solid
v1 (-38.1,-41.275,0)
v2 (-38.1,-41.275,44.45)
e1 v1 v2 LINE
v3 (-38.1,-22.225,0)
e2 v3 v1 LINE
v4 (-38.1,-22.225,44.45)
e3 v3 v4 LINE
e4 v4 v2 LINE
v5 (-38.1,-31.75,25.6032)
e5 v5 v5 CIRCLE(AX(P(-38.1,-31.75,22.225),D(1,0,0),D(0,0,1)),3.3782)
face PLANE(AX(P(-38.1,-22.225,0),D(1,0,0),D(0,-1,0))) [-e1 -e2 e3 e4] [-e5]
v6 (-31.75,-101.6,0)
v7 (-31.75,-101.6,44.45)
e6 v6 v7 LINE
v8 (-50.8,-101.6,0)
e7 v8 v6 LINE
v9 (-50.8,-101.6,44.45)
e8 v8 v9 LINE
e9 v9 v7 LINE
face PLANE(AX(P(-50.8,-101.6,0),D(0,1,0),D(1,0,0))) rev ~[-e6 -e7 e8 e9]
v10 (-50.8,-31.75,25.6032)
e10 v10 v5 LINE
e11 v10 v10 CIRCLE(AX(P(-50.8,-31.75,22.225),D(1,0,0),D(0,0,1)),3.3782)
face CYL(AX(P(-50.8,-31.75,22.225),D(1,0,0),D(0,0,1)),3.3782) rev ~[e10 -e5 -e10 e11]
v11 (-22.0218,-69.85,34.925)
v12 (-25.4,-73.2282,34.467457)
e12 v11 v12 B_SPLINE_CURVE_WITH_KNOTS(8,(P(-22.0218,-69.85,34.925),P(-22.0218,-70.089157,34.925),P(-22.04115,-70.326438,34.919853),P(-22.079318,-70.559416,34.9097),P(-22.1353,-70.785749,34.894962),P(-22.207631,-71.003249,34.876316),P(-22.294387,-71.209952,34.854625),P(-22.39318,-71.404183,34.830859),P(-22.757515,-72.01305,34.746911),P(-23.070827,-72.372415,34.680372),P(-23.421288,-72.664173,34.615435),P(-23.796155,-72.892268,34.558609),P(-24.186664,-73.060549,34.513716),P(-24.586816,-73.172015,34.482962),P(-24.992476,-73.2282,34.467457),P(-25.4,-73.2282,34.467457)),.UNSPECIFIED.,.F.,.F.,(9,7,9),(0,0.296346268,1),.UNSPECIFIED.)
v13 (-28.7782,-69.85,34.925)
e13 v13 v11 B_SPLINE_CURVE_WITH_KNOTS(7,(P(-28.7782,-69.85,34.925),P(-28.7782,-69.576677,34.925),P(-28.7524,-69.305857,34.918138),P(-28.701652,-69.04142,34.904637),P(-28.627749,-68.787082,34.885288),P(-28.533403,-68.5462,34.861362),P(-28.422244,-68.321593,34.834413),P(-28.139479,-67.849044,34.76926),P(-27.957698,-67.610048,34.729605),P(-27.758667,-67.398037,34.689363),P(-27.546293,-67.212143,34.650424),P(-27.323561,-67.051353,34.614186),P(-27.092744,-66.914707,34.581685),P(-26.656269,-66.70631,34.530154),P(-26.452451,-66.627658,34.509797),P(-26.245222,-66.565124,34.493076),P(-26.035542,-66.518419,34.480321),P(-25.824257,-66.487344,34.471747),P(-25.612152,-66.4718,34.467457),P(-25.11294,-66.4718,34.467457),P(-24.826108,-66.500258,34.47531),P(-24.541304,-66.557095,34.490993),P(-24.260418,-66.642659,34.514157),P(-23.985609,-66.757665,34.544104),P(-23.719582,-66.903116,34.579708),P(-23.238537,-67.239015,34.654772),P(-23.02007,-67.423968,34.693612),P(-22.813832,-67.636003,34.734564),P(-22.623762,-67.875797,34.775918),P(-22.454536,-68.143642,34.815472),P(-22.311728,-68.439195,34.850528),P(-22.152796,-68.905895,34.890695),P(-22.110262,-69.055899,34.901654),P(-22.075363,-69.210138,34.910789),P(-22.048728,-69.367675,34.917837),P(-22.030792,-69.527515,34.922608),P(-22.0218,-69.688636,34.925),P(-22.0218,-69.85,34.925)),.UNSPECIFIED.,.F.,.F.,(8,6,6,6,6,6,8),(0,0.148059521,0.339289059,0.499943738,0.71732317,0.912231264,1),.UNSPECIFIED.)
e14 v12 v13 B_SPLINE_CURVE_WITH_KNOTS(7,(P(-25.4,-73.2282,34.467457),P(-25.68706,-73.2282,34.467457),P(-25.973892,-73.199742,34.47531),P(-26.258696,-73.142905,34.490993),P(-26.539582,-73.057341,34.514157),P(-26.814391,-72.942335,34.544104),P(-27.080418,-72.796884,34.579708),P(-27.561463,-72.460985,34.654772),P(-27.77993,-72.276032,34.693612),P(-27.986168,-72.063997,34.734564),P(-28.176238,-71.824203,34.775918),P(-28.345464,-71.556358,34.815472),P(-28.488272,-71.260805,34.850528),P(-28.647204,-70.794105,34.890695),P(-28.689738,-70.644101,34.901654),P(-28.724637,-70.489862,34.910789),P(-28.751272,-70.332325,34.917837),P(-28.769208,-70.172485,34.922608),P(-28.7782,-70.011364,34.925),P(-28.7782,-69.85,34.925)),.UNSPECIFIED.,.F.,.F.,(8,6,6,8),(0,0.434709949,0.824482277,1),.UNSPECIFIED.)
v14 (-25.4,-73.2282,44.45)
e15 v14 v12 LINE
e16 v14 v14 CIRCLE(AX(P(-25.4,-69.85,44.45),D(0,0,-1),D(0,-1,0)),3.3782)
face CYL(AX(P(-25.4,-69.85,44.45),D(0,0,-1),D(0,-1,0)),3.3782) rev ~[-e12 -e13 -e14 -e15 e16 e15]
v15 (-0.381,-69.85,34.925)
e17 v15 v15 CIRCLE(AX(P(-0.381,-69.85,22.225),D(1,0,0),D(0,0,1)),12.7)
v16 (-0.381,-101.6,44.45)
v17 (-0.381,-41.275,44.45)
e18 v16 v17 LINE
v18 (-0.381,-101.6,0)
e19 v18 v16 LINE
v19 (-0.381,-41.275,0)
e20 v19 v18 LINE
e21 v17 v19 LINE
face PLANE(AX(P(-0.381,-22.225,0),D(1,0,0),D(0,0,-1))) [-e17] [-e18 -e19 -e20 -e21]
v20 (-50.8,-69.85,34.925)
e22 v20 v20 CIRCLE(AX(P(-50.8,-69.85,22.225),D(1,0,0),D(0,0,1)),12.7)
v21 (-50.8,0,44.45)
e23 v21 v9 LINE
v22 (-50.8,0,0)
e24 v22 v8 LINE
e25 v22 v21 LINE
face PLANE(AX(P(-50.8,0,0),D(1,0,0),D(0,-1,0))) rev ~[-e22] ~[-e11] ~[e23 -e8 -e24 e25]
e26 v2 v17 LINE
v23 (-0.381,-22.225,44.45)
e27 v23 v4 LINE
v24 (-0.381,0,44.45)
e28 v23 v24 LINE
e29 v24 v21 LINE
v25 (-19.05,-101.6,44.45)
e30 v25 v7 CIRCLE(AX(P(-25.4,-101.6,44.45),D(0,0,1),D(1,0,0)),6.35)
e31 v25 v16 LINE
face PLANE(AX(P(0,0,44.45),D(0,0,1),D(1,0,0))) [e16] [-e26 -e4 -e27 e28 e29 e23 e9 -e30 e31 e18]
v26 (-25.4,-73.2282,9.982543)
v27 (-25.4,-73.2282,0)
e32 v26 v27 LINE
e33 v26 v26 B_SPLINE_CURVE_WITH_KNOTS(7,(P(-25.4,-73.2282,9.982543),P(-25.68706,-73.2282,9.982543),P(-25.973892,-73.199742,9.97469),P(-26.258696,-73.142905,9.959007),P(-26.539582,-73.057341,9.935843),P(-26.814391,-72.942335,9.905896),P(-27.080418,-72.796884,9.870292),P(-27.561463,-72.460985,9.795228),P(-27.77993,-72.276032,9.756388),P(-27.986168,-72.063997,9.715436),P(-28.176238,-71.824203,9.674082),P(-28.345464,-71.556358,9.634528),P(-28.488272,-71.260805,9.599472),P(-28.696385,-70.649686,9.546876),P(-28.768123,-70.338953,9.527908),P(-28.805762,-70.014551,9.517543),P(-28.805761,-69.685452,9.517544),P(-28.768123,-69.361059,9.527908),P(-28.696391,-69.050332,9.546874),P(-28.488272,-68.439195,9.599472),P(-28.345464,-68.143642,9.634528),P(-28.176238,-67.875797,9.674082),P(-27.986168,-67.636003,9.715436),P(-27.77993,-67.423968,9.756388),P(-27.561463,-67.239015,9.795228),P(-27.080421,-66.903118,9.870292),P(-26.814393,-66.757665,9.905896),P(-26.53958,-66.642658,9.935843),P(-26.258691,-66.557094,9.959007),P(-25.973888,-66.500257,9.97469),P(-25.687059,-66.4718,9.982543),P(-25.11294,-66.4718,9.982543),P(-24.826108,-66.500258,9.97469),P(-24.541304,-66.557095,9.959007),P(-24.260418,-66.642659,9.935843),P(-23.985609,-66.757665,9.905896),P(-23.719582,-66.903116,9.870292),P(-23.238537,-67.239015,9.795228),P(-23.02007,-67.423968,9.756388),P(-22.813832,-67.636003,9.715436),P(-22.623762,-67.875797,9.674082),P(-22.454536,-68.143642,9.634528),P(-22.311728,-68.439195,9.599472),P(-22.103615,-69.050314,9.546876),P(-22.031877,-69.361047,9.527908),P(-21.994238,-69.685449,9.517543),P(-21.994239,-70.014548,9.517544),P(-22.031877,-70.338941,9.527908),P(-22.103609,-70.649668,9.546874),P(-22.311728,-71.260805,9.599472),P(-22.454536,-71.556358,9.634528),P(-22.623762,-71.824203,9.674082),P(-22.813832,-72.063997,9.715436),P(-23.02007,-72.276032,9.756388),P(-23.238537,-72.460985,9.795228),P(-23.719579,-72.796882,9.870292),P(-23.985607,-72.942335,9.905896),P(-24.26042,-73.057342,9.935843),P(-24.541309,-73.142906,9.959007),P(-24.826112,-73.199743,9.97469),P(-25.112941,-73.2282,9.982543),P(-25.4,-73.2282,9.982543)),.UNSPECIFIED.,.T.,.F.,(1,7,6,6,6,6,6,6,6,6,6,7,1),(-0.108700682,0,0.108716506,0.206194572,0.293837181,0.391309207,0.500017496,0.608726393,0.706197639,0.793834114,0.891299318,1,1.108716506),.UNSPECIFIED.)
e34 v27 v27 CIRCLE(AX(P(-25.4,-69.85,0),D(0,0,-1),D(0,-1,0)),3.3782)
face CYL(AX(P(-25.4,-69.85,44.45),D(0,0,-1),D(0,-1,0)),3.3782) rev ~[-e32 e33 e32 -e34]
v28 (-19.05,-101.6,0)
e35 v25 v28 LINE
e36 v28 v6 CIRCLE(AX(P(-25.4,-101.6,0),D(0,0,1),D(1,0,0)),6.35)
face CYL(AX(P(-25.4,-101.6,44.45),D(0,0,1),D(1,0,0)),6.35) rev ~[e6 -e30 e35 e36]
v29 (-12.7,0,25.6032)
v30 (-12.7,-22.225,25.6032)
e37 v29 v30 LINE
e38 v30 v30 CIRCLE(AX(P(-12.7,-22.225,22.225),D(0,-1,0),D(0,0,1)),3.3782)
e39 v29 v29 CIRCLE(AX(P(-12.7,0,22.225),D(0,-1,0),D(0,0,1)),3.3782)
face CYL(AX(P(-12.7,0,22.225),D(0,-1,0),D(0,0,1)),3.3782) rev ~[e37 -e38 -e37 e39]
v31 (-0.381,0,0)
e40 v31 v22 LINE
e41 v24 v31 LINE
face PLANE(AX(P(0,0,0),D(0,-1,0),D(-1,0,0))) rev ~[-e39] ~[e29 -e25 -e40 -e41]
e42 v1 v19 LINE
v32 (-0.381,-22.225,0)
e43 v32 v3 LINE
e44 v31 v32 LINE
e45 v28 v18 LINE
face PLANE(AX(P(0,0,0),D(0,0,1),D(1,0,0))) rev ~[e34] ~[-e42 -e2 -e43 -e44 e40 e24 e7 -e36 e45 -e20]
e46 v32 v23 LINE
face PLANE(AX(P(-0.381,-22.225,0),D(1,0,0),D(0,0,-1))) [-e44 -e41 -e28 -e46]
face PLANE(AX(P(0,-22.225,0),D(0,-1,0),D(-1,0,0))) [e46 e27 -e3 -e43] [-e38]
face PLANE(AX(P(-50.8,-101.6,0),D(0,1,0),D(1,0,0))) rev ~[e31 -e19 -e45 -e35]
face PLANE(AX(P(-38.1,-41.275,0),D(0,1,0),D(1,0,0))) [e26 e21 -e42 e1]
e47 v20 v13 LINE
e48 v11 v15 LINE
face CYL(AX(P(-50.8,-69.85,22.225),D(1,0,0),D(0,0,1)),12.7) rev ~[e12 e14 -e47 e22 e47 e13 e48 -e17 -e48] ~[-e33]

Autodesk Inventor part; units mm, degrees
ref_plane "YZ Plane" through (0, 0, 0) normal (1, 0, 0) x (0, 1, 0)
ref_plane "XZ Plane" through (0, 0, 0) normal (0, 1, 0) x (-1, 0, 0)
ref_plane "XY Plane" through (0, 0, 0) normal (0, 0, 1) x (1, 0, 0)
sketch "Sketch1" plane through (0, 0, 0) normal (0, 0, 1) x (1, 0, 0)
  line L0 (0, 0) -> (-50.8, 0)
  line L1 (-50.8, 0) -> (-50.8, -101.6)
  line L2 (-50.8, -101.6) -> (0, -101.6)
  line L3 (0, -22.225) -> (-38.1, -22.225)
  line L4 (-38.1, -22.225) -> (-38.1, -41.275)
  line L5 (-38.1, -41.275) -> (0, -41.275)
  line L6 (0, -101.6) -> (0, -41.275)
  line L7 (0, -22.225) -> (0, 0)
  dimension "d0" = 101.6
  dimension "d1" = 50.8
  dimension "d4" = 22.225
  dimension "d5" = 38.1
  dimension "d6" = 19.05
extrude "Extrusion1" add sketch "Sketch1" along normal blind 44.45
sketch "Sketch2" plane through (0, -22.225, 0) normal (1, 0, 0) x (0, 0, -1)
  line L0 (-44.45, 0) -> (-44.45, 22.225) projected
  line L1 (0, 22.225) -> (0, -79.375) projected
  line L2 (-44.45, 22.225) -> (0, 22.225)
  line L3 (0, 22.225) -> (0, -79.375)
  line L4 (0, -79.375) -> (-44.45, -79.375)
  line L5 (-44.45, -79.375) -> (-44.45, 22.225)
extrude "Extrusion2" cut sketch "Sketch2" against normal blind 0.381
sketch "Sketch3" plane through (-50.8, 0, 44.45) normal (0, 1, 0) x (1, 0, 0)
  line L0 (0, 44.45) -> (0, 0) projected
  line L1 (50.419, 44.45) -> (0, 44.45) projected
  point P0 (50.8, 44.45)
  point P1 (38.1, 22.225)
  dimension "d9" = 38.1
  dimension "d10" = 22.225
hole "Hole1" at (-12.7, 0, 22.225) direction (0, -1, 0) diameter 6.7564 end up to surface clearance for "Flat Head Machine Screw (82)" size "1/4" standard "Ansi Unified Screw Threads"
sketch "Sketch4" plane through (-50.8, -101.6, 0) normal (-1, 0, 0) x (0, 0, 1)
  line L0 (0, 101.6) -> (0, 0) projected
  line L1 (0, 101.6) -> (44.45, 101.6) projected
  point P0 (22.225, 69.85)
  dimension "d18" = 22.225
  dimension "d19" = 31.75
hole "Hole2" at (-50.8, -31.75, 22.225) direction (1, 0, 0) diameter 6.7564 end through all clearance for "Hex Head Bolt" size "1/4" standard "Ansi Unified Screw Threads"
sketch "Sketch5" plane through (-50.8, -101.6, 0) normal (-1, 0, 0) x (0, 0, 1)
  line L0 (0, 101.6) -> (0, 0) projected
  line L1 (0, 101.6) -> (44.45, 101.6) projected
  point P0 (22.225, 31.75)
  dimension "d27" = 22.225
  dimension "d28" = 69.85
hole "Hole3" at (-50.8, -69.85, 22.225) direction (1, 0, 0) diameter 25.4 end through all
sketch "Sketch6" plane through (0, 0, 44.45) normal (0, 0, 1) x (1, 0, 0)
  line L0 (-0.381, 0) -> (-50.8, 0) projected
  line L1 (-50.8, 0) -> (-50.8, -101.6) projected
  point P0 (0, 0)
  point P1 (-25.4, -69.85)
  dimension "d36" = 69.85
  dimension "d37" = 25.4
hole "Hole4" at (-25.4, -69.85, 44.45) direction (0, 0, -1) diameter 6.7564 end through all clearance for "Hex Head Bolt" size "1/4" standard "Ansi Unified Screw Threads"
sketch "Sketch7" plane through (0, 0, 44.45) normal (0, 0, 1) x (1, 0, 0)
  circle A0 centre (-25.4, -101.6) radius 6.35
  line L0 (-0.381, 0) -> (-50.8, 0) projected
  line L1 (-50.8, 0) -> (-50.8, -101.6) projected
  point P0 (0, 0)
  dimension "d45" = 101.6
  dimension "d46" = 25.4
  dimension "d47" = 12.7
extrude "Extrusion3" cut sketch "Sketch7" against normal through all
equation "\"d10\" = 0.5 * width"
equation "\"d18\" = 0.5 * width"
equation "\"d27\" = 0.5 * width"
equation "\"width\" = 44.45"
properties part number "AsBuilt Over Support For Arm"
